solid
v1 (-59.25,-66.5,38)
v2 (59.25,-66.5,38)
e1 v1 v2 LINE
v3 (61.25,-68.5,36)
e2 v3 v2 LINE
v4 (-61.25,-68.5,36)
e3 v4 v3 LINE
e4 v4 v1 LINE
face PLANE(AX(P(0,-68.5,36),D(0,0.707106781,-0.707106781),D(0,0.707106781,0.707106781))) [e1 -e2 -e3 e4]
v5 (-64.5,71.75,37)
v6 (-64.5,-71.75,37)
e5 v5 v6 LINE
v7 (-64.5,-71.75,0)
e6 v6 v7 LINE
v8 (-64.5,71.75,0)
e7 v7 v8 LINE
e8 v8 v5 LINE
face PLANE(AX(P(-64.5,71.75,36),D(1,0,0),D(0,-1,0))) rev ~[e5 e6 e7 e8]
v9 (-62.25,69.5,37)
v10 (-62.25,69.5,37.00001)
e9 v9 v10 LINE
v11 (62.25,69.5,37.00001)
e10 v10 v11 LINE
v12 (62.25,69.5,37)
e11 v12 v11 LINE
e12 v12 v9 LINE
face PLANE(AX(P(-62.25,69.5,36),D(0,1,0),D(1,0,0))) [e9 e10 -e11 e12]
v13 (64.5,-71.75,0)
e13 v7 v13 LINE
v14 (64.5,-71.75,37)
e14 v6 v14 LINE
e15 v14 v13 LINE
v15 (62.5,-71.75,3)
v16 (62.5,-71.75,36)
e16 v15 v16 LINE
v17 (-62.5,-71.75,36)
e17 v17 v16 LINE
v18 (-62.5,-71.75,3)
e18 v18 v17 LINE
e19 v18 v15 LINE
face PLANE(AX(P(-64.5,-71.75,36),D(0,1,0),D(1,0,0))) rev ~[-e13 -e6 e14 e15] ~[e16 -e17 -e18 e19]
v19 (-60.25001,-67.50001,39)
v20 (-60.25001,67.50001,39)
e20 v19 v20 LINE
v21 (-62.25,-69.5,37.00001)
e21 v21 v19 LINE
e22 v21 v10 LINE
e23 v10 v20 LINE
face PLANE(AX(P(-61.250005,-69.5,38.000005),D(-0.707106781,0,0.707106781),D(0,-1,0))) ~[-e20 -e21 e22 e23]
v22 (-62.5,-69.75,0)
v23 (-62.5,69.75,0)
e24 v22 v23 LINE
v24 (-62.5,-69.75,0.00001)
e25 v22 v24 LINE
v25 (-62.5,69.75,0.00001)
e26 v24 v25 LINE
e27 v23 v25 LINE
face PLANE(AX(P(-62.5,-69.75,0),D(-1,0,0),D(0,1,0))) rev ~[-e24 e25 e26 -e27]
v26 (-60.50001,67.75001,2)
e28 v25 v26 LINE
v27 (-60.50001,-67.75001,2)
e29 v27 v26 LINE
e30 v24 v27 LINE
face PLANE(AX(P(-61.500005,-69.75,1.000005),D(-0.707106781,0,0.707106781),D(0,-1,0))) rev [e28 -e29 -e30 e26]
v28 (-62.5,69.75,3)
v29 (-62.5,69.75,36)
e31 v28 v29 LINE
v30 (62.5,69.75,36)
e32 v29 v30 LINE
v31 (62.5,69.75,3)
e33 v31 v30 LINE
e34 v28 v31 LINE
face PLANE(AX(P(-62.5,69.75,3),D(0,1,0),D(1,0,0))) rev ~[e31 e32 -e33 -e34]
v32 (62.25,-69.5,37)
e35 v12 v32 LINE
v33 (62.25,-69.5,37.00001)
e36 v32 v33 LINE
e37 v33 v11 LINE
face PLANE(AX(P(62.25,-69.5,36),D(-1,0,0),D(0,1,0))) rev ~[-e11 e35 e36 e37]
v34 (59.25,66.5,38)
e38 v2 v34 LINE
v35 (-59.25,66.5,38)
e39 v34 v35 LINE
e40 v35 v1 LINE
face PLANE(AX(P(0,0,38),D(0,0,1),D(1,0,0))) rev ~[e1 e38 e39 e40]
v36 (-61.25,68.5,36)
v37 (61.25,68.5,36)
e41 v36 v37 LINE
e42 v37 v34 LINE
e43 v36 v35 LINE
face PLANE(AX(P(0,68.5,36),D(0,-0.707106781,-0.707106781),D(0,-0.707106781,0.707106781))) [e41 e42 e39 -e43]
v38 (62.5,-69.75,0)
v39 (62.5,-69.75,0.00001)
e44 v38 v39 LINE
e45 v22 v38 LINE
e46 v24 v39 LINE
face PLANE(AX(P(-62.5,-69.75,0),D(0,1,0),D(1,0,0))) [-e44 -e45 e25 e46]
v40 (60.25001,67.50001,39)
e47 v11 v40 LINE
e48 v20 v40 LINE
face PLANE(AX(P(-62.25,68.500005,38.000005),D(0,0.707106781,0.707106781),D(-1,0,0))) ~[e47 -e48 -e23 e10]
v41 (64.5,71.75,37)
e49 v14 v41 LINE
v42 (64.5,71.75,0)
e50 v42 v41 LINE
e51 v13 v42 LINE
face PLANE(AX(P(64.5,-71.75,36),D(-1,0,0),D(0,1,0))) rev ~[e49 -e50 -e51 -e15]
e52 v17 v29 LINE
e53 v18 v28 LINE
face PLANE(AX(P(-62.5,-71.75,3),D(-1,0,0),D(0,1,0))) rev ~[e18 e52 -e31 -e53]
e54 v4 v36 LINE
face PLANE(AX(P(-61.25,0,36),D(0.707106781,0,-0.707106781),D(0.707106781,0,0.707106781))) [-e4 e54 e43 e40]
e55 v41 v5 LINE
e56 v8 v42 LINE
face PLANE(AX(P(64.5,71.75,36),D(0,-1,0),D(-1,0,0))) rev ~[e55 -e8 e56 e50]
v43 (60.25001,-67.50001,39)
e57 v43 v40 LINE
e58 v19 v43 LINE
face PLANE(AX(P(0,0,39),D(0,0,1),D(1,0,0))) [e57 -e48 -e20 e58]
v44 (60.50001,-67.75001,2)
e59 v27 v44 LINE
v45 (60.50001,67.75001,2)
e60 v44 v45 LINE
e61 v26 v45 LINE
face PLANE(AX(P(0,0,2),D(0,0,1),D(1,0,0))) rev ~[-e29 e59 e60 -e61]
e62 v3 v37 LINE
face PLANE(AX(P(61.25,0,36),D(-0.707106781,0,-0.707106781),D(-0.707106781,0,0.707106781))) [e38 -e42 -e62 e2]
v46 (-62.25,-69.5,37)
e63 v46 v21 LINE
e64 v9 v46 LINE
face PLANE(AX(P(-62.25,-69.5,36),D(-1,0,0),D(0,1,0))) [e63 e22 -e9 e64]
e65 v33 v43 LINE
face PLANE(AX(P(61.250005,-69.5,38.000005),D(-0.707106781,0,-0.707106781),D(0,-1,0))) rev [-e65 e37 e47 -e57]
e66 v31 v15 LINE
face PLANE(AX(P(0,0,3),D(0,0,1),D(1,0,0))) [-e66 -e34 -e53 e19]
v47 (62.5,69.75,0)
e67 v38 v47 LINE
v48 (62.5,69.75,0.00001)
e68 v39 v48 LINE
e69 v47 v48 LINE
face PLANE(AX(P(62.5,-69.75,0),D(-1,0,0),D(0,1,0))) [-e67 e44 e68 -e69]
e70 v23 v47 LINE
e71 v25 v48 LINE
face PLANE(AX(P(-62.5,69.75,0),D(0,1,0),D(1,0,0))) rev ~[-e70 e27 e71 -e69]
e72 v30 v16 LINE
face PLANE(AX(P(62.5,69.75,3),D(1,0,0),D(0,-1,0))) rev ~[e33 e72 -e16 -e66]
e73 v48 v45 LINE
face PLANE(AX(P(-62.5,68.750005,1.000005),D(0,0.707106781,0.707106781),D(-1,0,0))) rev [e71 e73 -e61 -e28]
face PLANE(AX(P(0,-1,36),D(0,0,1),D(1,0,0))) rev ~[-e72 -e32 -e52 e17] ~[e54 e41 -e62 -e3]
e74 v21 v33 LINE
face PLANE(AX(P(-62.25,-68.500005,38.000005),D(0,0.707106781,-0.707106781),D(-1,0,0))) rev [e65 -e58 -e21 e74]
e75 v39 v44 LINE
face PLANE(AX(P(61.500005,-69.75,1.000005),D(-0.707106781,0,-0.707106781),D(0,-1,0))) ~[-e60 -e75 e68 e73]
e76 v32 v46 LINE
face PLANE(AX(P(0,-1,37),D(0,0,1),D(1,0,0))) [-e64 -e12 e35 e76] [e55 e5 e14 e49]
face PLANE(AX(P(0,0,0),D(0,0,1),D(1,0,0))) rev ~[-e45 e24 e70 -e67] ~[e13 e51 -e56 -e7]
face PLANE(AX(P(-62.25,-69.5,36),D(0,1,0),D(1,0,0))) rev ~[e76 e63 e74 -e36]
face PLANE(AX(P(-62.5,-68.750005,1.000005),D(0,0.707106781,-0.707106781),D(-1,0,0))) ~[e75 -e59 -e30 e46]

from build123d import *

# Parameters (mm, degrees)
F0_W      = 129
F0_H      = 143.5
F0_W_2    = 125
F0_H_2    = 139.5
F1_DEPTH  = 3
F2_DEPTH  = 2
F3_SIZE   = 1.99999
F5_DEPTH  = 33
F6_W      = 125
F6_H      = 141.5
F6_W_2    = 124.5
F6_H_2    = 139
F6_W_3    = 122.5
F6_H_3    = 137
F7_DEPTH  = 1
F8_DEPTH  = 3
F9_SIZE   = 1.99999
F10_DEPTH = 2
F10_TAPER = 45


# Not quite as in the source:
# - a fillet or chamfer is up to 0.001 mm smaller than in the source, because OpenCascade refuses the exact size
# - a feature names something its author has since deleted; it is built from what else it names


with BuildPart() as f1:
    # F0 (on Top) → F1 (new body)
    with BuildSketch(Plane.XY):
        Rectangle(F0_W, F0_H)
        Rectangle(F0_W_2, F0_H_2, mode=Mode.SUBTRACT)
        Rectangle(F0_W_2, F0_H_2)
    extrude(amount=F1_DEPTH)

    # F0 (on Top) → F2 (cut)
    with BuildSketch(Plane.XY):
        Rectangle(F0_W_2, F0_H_2)
    extrude(amount=F2_DEPTH, mode=Mode.SUBTRACT)

    # F3 (size 2 in the source; OpenCascade refuses exactly that, so slightly less here)
    f3_edges = [f1.edges().sort_by_distance(p)[0] for p in [
        (0, -69.75, 2),
        (62.5, 0, 2),
        (0, 69.75, 2),
        (-62.5, 0, 2),
    ]]
    chamfer(f3_edges, length=F3_SIZE)

    # F4 (on face) → F5 (join)
    with BuildSketch(Plane.XY.offset(3)):
        Polygon((-64.5, 71.75), (-64.5, -71.75), (-62.5, -71.75), (-62.5, 69.75), (62.5, 69.75), (62.5, -71.75), (64.5, -71.75), (64.5, 71.75), align=None)
    extrude(amount=F5_DEPTH)

    # F6 (on face) → F7 (join)
    with BuildSketch(Plane.XY.offset(36)):
        with Locations((0, -1)):
            Rectangle(F6_W, F6_H)
        Rectangle(F6_W_2, F6_H_2, mode=Mode.SUBTRACT)
        Rectangle(F6_W_2, F6_H_2)
        Rectangle(F6_W_3, F6_H_3, mode=Mode.SUBTRACT)
        Polygon((-64.5, 71.75), (-64.5, -71.75), (-62.5, -71.75), (-62.5, 69.75), (62.5, 69.75), (62.5, -71.75), (64.5, -71.75), (64.5, 71.75), align=None)
    extrude(amount=F7_DEPTH)

    # F6 (on face) → F8 (join)
    with BuildSketch(Plane.XY.offset(36)):
        Rectangle(F6_W_2, F6_H_2)
        Rectangle(F6_W_3, F6_H_3, mode=Mode.SUBTRACT)
        Rectangle(F6_W_3, F6_H_3)
    extrude(amount=F8_DEPTH)

    # F9 (size 2 in the source; OpenCascade refuses exactly that, so slightly less here)
    f9_edges = [f1.edges().sort_by_distance(p)[0] for p in [
        (-62.25, 0, 39),
        (0, 69.5, 39),
        (0, -69.5, 39),
        (62.25, 0, 39),
    ]]
    chamfer(f9_edges, length=F9_SIZE)

    # F6 (on face) → F10 (cut)
    with BuildSketch(Plane.XY.offset(36)):
        Rectangle(F6_W_3, F6_H_3)
    extrude(amount=F10_DEPTH, taper=F10_TAPER, mode=Mode.SUBTRACT)


solid = f1.part
